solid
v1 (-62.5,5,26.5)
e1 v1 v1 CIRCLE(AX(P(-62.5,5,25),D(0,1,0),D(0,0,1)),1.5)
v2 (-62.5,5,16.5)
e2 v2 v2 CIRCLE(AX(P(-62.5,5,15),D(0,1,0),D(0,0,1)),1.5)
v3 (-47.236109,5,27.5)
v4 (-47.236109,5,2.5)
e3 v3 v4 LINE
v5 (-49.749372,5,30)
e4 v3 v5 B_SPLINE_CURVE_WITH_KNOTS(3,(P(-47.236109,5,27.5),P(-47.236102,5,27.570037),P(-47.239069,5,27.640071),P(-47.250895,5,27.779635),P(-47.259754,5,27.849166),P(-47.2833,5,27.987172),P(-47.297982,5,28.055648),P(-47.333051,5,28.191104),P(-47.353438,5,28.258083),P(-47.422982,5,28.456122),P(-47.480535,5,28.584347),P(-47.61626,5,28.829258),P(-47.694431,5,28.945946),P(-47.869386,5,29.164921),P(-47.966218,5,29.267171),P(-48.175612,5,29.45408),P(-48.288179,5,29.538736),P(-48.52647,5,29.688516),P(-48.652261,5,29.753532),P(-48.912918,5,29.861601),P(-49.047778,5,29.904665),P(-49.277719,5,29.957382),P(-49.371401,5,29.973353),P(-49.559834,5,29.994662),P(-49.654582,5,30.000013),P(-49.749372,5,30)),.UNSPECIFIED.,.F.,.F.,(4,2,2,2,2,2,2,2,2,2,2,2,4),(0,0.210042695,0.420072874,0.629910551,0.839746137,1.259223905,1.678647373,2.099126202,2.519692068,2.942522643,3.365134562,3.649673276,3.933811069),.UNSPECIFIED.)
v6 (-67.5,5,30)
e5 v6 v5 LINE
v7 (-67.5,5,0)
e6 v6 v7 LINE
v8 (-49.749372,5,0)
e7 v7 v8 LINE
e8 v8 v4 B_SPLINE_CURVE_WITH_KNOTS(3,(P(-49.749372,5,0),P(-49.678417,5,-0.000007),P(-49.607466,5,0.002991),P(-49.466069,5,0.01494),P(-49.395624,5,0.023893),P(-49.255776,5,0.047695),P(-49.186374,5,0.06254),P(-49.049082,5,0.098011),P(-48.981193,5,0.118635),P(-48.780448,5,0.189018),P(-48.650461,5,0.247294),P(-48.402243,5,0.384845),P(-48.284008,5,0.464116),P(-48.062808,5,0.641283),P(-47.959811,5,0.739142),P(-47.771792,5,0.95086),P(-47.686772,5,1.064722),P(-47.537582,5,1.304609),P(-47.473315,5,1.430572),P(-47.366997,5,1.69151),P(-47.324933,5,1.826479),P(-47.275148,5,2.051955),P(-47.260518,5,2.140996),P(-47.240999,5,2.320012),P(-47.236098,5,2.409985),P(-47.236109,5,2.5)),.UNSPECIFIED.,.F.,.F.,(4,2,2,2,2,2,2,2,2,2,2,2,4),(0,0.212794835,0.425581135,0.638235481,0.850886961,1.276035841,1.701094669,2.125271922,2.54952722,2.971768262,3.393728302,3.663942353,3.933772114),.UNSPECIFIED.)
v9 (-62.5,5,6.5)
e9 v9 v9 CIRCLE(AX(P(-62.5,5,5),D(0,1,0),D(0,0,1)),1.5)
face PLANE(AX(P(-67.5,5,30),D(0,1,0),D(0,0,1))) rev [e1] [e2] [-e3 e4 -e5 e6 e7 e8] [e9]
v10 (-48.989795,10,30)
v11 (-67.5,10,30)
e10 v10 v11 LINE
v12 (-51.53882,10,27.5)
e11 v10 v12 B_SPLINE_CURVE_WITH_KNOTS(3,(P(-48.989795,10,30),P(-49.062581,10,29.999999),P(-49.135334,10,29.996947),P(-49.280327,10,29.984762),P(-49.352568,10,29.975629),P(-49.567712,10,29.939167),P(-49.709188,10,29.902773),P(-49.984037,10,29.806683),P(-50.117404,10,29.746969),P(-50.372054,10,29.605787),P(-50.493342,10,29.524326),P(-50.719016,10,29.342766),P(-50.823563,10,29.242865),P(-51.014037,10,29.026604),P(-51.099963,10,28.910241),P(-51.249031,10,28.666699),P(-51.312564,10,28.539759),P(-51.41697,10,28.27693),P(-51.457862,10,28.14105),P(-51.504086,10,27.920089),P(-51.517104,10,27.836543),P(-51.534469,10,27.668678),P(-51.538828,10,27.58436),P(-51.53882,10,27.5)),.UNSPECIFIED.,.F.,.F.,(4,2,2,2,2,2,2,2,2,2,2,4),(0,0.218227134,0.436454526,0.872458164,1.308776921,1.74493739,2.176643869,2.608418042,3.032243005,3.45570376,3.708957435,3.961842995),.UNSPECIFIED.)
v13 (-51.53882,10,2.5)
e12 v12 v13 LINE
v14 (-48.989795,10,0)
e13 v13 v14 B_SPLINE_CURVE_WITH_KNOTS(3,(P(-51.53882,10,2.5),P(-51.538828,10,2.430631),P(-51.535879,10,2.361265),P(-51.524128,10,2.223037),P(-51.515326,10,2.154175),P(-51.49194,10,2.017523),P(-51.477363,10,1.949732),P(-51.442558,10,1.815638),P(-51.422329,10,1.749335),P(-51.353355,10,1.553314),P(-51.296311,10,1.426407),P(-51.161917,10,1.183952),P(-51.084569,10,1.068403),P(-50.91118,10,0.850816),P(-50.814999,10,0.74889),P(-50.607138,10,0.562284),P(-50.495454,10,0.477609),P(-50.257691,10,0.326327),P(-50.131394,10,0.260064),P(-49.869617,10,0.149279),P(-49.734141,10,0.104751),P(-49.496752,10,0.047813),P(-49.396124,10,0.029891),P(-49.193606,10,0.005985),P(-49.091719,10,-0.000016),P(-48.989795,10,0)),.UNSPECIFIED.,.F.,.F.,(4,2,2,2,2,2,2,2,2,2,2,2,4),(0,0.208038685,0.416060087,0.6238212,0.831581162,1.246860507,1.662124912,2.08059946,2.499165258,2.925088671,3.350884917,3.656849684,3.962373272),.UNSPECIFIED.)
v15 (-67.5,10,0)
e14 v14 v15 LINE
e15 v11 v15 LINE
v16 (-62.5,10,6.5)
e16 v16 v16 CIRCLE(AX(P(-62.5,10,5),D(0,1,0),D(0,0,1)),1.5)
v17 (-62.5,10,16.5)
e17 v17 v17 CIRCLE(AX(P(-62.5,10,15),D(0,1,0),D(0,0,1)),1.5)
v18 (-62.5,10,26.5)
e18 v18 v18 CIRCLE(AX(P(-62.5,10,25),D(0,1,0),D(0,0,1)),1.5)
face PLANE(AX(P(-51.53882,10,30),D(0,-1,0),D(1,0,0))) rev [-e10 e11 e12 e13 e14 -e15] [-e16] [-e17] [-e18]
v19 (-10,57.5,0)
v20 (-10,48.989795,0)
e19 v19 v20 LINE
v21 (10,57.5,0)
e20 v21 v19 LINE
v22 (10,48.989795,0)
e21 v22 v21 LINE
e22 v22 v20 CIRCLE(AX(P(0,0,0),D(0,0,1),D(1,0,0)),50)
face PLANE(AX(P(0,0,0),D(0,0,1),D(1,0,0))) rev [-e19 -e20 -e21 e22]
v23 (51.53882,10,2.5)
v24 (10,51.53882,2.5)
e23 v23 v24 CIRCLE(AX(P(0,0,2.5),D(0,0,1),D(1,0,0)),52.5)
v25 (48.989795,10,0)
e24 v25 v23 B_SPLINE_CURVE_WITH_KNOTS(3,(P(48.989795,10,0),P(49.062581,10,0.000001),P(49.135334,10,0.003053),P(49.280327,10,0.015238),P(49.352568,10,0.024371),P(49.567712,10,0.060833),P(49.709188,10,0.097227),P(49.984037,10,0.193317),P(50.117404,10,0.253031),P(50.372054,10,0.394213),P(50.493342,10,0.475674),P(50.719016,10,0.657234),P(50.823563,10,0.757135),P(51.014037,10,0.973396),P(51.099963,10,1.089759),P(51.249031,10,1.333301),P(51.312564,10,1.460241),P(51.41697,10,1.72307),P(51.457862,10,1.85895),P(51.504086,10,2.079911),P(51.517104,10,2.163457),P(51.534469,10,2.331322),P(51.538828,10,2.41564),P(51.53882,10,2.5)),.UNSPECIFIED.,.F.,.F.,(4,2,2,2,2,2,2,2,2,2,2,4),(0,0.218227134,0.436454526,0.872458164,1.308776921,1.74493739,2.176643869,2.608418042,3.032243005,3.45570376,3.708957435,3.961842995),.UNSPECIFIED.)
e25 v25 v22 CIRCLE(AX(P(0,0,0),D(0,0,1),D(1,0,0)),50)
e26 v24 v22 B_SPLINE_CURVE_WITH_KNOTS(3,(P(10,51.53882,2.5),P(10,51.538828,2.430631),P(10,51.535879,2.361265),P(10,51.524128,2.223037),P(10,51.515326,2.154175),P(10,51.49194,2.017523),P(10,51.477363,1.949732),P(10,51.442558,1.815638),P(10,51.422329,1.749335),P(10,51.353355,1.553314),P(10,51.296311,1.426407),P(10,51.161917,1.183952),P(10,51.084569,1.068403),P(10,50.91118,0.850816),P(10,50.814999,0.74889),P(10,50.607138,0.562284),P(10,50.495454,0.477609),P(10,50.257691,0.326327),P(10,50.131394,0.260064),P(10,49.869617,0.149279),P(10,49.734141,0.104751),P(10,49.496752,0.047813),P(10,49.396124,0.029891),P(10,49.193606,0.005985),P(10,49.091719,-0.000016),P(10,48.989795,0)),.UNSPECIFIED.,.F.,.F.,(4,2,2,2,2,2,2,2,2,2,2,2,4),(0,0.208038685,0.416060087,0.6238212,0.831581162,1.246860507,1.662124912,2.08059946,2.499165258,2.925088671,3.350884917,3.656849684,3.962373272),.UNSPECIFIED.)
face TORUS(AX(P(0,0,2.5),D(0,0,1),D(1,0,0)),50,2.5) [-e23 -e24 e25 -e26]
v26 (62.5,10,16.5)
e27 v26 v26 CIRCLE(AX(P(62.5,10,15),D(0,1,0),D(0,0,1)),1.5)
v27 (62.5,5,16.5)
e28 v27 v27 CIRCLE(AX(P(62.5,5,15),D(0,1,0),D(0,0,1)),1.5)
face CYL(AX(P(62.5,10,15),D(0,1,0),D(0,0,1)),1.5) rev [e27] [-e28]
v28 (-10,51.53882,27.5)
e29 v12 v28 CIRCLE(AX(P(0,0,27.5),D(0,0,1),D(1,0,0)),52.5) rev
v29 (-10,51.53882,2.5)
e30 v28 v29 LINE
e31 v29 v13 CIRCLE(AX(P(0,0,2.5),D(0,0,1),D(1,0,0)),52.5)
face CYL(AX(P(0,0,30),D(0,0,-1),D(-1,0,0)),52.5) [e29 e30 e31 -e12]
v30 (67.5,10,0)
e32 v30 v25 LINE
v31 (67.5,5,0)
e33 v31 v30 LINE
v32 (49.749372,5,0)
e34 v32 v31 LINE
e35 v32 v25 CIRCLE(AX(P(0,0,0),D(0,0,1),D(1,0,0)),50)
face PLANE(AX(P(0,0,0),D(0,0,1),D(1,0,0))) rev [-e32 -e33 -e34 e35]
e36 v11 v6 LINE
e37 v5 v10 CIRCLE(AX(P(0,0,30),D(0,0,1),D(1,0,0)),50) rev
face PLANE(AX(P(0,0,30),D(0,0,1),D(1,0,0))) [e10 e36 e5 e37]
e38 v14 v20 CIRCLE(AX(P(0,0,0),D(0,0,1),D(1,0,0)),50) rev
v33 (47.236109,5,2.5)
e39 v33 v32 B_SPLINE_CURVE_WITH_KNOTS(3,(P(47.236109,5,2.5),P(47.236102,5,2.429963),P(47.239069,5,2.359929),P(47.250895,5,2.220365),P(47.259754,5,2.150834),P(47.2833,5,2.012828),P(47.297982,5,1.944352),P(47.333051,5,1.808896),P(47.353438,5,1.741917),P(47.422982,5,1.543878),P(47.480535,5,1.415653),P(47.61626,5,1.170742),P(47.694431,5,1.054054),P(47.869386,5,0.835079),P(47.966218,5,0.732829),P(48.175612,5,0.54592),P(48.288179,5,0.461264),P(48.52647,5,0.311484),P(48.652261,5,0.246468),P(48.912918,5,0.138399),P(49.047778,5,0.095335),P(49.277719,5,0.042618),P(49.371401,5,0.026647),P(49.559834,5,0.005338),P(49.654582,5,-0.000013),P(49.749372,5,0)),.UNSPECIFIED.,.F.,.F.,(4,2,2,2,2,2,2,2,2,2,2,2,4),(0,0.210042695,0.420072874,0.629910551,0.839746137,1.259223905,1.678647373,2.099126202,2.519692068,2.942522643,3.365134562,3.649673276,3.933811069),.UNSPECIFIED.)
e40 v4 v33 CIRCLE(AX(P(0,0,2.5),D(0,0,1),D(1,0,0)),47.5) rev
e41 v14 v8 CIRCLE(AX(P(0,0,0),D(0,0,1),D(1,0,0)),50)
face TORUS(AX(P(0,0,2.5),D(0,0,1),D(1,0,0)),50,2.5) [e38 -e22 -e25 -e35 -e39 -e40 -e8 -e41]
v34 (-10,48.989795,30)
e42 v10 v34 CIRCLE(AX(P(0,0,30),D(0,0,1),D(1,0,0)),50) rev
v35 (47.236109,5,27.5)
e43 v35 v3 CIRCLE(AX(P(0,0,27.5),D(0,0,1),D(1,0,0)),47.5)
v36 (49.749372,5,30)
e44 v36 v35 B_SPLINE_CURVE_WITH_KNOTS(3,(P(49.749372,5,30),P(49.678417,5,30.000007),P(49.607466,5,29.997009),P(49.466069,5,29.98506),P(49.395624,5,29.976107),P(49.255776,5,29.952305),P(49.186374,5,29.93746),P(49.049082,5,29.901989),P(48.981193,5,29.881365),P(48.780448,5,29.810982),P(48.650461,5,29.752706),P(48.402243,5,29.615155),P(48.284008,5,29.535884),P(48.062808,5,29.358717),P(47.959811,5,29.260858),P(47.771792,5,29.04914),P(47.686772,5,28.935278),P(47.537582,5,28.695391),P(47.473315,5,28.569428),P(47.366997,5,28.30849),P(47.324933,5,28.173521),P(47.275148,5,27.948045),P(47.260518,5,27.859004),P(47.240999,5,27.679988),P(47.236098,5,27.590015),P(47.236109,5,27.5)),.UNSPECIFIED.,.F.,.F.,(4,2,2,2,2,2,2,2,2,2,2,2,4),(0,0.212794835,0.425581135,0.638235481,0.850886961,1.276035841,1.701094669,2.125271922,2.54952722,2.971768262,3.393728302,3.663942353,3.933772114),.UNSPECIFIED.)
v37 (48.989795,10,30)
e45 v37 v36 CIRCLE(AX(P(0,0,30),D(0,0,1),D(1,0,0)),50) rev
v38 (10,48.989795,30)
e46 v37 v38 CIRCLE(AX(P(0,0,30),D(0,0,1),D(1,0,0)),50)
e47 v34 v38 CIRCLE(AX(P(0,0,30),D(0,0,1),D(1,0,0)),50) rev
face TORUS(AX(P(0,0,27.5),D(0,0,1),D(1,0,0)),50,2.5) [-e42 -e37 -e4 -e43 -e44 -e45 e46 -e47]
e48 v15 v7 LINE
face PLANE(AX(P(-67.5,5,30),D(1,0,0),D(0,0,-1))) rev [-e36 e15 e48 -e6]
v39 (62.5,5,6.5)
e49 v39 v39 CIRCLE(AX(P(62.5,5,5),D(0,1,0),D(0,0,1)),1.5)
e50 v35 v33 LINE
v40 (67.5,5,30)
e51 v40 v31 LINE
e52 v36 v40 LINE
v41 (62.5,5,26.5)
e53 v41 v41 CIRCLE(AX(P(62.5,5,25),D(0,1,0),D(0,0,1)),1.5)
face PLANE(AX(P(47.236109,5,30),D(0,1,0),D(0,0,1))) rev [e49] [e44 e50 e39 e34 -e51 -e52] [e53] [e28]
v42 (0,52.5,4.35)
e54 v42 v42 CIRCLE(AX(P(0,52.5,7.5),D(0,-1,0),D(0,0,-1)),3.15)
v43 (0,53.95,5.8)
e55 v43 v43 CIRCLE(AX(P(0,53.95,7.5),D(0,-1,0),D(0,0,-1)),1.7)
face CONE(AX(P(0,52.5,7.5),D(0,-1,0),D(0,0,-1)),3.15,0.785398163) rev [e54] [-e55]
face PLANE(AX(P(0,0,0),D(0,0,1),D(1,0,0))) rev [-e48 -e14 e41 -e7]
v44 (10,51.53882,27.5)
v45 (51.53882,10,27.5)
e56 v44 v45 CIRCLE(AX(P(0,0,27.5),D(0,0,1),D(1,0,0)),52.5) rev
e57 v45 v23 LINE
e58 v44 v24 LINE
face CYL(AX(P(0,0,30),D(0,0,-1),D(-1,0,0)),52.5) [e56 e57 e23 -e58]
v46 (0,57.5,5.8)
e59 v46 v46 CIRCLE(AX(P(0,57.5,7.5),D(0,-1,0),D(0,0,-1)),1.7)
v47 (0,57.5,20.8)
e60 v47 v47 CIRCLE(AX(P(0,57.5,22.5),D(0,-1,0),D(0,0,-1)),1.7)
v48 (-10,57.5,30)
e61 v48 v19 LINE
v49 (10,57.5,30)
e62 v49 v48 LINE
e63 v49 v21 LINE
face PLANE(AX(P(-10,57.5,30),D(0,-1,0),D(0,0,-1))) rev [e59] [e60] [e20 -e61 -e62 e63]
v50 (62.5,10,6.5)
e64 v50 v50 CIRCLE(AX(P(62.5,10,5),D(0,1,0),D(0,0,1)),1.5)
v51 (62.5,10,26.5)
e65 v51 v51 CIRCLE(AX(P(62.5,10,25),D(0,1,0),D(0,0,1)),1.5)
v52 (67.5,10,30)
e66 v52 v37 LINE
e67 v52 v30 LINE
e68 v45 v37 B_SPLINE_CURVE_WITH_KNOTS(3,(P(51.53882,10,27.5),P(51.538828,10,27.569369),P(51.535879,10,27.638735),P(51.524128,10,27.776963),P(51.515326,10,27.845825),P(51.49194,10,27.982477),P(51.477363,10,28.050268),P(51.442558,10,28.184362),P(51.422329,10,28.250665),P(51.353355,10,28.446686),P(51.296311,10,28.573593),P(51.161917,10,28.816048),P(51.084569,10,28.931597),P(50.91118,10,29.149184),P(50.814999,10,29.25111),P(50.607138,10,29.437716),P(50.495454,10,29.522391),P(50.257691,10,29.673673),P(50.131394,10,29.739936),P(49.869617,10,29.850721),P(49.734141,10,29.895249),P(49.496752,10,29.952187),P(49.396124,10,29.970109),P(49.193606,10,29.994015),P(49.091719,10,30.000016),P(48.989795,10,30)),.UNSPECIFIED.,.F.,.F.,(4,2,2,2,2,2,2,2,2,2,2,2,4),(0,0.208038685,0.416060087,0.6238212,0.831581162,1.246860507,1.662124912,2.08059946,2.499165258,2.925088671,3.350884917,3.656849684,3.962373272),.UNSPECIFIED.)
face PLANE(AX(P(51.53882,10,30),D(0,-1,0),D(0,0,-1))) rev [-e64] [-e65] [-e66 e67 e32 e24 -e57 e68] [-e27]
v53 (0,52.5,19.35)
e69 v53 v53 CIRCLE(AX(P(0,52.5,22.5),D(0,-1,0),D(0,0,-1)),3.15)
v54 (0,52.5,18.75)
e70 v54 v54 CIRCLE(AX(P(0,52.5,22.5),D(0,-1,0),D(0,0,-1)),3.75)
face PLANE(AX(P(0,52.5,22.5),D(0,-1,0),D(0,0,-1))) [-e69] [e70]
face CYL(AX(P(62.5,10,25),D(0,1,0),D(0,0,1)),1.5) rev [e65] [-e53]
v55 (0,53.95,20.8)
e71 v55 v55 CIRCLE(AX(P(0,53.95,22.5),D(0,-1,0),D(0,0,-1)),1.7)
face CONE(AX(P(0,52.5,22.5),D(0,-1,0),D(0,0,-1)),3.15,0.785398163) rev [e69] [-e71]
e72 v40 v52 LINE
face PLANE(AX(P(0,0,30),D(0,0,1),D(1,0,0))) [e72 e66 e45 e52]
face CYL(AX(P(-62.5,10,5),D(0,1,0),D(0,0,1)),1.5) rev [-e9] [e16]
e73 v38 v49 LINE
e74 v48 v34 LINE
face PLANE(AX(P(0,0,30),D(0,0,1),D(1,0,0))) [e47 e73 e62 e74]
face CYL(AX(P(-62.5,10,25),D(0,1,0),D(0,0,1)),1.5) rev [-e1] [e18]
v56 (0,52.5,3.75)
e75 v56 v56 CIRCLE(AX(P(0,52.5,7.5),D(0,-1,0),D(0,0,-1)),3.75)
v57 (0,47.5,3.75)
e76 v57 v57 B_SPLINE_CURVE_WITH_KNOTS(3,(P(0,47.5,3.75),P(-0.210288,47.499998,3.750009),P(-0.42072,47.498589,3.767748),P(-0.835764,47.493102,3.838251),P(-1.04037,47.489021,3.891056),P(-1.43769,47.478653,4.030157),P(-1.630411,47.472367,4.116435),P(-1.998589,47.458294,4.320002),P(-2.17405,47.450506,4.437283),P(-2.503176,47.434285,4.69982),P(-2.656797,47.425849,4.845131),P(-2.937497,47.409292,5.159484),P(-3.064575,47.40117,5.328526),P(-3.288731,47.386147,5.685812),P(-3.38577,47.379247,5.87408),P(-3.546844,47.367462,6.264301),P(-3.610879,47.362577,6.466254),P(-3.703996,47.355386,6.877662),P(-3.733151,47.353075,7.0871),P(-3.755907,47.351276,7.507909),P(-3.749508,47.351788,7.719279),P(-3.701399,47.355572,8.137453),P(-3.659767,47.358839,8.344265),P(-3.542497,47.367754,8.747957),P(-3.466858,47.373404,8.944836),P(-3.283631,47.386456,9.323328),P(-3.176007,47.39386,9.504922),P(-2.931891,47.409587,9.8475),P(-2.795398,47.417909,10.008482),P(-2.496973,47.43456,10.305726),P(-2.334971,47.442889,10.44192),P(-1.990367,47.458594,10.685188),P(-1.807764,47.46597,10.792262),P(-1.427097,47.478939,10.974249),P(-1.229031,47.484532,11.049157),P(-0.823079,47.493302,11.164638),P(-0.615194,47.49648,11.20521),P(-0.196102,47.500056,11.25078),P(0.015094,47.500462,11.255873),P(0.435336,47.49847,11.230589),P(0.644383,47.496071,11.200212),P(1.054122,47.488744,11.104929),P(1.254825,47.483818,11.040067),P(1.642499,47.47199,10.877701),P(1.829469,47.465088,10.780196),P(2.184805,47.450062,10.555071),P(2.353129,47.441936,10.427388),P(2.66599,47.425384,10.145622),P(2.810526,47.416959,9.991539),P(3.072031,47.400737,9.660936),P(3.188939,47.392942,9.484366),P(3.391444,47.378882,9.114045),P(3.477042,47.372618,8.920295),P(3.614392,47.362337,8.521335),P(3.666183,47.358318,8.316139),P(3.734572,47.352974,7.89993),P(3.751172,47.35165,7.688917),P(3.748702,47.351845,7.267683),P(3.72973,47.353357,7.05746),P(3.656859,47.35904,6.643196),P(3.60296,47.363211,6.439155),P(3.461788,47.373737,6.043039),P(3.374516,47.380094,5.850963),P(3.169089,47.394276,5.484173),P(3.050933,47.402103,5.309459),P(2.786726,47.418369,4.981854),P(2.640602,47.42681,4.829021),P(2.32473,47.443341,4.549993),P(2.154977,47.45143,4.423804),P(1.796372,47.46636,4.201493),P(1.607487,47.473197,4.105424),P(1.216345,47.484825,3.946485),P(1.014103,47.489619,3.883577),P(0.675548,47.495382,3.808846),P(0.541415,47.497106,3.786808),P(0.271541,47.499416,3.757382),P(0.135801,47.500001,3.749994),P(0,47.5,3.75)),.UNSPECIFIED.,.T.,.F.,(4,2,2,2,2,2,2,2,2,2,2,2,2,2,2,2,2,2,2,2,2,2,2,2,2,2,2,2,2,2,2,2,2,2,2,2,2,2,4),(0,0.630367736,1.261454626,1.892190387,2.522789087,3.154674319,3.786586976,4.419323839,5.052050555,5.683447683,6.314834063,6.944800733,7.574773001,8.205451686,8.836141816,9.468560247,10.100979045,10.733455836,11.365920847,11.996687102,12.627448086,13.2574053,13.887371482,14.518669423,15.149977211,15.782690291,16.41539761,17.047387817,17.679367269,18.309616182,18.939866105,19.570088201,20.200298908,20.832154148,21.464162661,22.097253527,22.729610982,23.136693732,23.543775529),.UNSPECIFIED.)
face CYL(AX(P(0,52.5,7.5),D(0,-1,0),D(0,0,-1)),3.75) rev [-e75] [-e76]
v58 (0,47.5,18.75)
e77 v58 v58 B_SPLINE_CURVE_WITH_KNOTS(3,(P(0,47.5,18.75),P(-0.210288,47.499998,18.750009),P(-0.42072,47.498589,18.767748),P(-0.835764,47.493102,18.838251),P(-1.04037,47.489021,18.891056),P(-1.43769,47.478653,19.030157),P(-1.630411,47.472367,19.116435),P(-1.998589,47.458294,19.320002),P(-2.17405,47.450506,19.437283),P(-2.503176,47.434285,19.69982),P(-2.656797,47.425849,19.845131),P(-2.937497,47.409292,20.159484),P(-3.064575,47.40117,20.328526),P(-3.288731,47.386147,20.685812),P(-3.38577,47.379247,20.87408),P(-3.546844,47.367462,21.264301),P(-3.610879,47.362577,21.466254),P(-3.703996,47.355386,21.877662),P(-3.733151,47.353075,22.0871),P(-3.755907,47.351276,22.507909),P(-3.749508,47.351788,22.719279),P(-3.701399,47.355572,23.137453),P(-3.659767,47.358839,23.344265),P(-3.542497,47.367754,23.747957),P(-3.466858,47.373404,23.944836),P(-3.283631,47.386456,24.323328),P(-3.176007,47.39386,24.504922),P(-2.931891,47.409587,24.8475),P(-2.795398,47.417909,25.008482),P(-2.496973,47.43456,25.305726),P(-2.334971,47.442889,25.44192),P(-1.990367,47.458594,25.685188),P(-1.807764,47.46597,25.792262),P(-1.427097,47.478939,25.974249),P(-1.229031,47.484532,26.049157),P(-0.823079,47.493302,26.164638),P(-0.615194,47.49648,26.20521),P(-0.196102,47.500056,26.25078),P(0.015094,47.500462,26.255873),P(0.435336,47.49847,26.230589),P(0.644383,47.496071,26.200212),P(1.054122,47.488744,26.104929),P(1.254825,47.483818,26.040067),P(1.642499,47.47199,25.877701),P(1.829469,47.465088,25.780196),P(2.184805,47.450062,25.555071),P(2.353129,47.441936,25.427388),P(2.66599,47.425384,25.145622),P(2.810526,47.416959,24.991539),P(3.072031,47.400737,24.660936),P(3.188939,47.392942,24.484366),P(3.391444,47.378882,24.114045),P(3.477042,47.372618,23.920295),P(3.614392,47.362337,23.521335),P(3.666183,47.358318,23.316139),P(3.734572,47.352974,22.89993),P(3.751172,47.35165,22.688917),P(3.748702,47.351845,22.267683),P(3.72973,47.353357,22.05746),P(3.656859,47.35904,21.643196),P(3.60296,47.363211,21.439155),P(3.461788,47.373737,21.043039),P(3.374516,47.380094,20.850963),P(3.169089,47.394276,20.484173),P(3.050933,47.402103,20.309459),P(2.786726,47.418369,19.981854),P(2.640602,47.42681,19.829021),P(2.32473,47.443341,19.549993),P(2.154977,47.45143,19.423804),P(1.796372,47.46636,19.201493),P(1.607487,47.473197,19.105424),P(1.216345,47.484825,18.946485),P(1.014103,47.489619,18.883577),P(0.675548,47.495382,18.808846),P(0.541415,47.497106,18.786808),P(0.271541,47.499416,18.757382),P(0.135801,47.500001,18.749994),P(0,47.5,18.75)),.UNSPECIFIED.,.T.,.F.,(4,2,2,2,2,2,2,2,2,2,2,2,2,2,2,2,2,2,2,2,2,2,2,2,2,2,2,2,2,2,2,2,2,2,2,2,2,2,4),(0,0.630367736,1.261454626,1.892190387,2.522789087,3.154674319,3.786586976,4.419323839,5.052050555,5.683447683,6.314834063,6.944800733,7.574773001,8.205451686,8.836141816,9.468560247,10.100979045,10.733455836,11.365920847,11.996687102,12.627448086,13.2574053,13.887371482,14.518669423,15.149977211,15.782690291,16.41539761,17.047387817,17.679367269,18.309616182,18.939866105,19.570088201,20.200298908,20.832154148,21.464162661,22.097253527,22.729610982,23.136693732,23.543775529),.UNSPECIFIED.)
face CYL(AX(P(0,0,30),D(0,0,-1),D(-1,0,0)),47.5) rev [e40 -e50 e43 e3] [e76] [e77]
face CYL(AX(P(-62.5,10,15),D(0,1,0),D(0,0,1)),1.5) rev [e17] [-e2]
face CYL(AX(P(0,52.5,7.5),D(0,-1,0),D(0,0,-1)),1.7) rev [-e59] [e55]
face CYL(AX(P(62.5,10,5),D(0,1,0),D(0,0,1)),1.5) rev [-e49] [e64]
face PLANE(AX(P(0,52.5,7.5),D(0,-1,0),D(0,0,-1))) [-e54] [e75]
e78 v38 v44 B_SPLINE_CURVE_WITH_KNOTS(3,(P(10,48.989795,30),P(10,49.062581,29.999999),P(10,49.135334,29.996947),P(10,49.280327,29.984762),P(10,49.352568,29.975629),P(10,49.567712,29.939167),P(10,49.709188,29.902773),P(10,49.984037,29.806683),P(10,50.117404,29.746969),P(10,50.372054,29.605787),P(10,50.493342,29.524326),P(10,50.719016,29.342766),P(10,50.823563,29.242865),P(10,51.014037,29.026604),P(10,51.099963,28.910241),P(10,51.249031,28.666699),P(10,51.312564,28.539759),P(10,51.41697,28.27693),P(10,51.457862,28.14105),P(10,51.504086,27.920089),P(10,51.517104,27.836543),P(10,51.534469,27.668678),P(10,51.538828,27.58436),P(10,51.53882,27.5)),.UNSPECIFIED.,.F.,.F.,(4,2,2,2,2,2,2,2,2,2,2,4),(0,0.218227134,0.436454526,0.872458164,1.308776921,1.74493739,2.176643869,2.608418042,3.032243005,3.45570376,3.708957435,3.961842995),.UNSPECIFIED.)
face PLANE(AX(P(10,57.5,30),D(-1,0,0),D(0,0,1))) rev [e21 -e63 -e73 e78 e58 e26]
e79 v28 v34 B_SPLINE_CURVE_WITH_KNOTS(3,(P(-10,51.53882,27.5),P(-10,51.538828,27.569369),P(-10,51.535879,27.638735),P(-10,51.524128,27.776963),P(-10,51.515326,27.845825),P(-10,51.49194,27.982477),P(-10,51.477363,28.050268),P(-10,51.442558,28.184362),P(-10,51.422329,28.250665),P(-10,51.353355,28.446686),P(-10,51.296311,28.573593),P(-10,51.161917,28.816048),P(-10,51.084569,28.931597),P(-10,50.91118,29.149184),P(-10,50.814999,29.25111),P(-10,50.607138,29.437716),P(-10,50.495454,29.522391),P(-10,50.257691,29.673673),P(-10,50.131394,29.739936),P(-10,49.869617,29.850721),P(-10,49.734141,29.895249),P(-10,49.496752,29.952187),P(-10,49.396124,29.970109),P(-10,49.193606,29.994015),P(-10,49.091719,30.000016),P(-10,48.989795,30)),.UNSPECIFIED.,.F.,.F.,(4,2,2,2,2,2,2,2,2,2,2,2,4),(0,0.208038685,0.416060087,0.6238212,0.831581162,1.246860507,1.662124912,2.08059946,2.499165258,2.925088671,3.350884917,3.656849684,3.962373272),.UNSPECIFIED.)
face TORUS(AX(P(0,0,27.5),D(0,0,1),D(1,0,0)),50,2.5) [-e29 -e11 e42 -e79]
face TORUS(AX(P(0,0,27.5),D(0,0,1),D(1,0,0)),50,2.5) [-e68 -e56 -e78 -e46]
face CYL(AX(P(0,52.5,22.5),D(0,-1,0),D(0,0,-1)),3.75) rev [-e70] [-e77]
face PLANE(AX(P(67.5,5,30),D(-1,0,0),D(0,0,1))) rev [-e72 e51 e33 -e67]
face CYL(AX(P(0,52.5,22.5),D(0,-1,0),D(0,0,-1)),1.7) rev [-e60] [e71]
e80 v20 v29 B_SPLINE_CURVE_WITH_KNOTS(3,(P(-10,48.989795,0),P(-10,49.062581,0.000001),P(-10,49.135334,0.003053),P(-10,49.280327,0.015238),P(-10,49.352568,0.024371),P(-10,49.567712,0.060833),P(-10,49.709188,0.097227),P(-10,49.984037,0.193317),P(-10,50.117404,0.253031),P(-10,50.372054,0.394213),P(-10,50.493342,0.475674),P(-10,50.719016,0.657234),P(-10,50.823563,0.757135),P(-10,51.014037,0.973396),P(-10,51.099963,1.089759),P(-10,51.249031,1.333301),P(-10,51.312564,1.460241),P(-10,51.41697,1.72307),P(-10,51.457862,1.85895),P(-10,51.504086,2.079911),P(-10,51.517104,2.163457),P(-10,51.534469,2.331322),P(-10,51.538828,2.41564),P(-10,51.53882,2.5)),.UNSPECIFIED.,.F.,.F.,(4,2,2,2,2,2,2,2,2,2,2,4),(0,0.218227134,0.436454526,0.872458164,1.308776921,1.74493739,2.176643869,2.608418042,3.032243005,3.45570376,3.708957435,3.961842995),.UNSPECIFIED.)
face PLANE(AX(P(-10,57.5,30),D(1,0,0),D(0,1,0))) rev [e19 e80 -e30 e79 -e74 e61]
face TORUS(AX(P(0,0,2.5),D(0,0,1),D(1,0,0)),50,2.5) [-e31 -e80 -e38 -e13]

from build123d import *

# Parameters (mm, degrees)
BOSS_EXTRUDE1_DEPTH                             = 30
FILLET1_R                                       = 2.5
SKETCH6_R                                       = 3.75
CUT_EXTRUDE1_DEPTH                              = 47.5
CSK_FOR_M3_FLAT_HEAD_MACHINE_SCREW1_D           = 3.4
CSK_FOR_M3_FLAT_HEAD_MACHINE_SCREW1_CSINK_D     = 6.3
CSK_FOR_M3_FLAT_HEAD_MACHINE_SCREW1_CSINK_ANGLE = 90
F_3_0MM_DOWEL_HOLE1_D                           = 3


with BuildPart() as part:
    # Sketch1 → Boss-Extrude1 (new body)
    with BuildSketch(Plane.XY):
        with BuildLine():
            Line((47.236109069, 5), (67.5, 5))
            Line((67.5, 5), (67.5, 10))
            Line((67.5, 10), (51.53882032, 10))
            ThreePointArc((51.53882032, 10), (37.123106012, 37.123106012), (10, 51.53882032))
            Line((10, 51.53882032), (10, 57.5))
            Line((10, 57.5), (-10, 57.5))
            Line((-10, 57.5), (-10, 51.53882032))
            ThreePointArc((-10, 51.53882032), (-37.123106012, 37.123106012), (-51.53882032, 10))
            Line((-51.53882032, 10), (-67.5, 10))
            Line((-67.5, 10), (-67.5, 5))
            Line((-67.5, 5), (-47.236109069, 5))
            ThreePointArc((-47.236109069, 5), (0, 47.5), (47.236109069, 5))
        make_face()
    extrude(amount=BOSS_EXTRUDE1_DEPTH)

    # Fillet1
    fillet1_edges = [part.edges().sort_by_distance(p)[0] for p in [
        (37.123106012, 37.123106012, 0),
        (0, 47.5, 0),
        (-37.123106012, 37.123106012, 0),
        (0, 47.5, 30),
        (37.123106012, 37.123106012, 30),
        (-37.123106012, 37.123106012, 30),
    ]]
    fillet(fillet1_edges, radius=FILLET1_R - 0.0001)  # a hair under: the kernel refuses the full size

    # Sketch6 → Cut-Extrude1 (cut)
    with BuildSketch(Plane.XZ.offset(-5)):
        with Locations(Location((0, 22.5, 0), (0, 0, 270))):
            Circle(SKETCH6_R)
        with Locations(Location((0, 7.5, 0), (0, 0, 270))):
            Circle(SKETCH6_R)
    extrude(amount=-CUT_EXTRUDE1_DEPTH, mode=Mode.SUBTRACT)

    # CSK for M3 Flat Head Machine Screw1 (through all)
    with Locations(Plane(origin=(0, 52.5, 0), x_dir=(-1, 0, 0), z_dir=(0, -1, 0))):
        with Locations((0, -22.5), (0, -7.5)):
            CounterSinkHole(CSK_FOR_M3_FLAT_HEAD_MACHINE_SCREW1_D / 2, CSK_FOR_M3_FLAT_HEAD_MACHINE_SCREW1_CSINK_D / 2, counter_sink_angle=CSK_FOR_M3_FLAT_HEAD_MACHINE_SCREW1_CSINK_ANGLE)

    # Ø3.0mm Dowel Hole1 (through all)
    with Locations(Plane(origin=(0, 10, 0), x_dir=(1, 0, 0), z_dir=(0, 1, 0))):
        with Locations((-62.5, -5), (-62.5, -15), (-62.5, -25), (62.5, -5), (62.5, -15), (62.5, -25)):
            Hole(F_3_0MM_DOWEL_HOLE1_D / 2)


solid = part.part
